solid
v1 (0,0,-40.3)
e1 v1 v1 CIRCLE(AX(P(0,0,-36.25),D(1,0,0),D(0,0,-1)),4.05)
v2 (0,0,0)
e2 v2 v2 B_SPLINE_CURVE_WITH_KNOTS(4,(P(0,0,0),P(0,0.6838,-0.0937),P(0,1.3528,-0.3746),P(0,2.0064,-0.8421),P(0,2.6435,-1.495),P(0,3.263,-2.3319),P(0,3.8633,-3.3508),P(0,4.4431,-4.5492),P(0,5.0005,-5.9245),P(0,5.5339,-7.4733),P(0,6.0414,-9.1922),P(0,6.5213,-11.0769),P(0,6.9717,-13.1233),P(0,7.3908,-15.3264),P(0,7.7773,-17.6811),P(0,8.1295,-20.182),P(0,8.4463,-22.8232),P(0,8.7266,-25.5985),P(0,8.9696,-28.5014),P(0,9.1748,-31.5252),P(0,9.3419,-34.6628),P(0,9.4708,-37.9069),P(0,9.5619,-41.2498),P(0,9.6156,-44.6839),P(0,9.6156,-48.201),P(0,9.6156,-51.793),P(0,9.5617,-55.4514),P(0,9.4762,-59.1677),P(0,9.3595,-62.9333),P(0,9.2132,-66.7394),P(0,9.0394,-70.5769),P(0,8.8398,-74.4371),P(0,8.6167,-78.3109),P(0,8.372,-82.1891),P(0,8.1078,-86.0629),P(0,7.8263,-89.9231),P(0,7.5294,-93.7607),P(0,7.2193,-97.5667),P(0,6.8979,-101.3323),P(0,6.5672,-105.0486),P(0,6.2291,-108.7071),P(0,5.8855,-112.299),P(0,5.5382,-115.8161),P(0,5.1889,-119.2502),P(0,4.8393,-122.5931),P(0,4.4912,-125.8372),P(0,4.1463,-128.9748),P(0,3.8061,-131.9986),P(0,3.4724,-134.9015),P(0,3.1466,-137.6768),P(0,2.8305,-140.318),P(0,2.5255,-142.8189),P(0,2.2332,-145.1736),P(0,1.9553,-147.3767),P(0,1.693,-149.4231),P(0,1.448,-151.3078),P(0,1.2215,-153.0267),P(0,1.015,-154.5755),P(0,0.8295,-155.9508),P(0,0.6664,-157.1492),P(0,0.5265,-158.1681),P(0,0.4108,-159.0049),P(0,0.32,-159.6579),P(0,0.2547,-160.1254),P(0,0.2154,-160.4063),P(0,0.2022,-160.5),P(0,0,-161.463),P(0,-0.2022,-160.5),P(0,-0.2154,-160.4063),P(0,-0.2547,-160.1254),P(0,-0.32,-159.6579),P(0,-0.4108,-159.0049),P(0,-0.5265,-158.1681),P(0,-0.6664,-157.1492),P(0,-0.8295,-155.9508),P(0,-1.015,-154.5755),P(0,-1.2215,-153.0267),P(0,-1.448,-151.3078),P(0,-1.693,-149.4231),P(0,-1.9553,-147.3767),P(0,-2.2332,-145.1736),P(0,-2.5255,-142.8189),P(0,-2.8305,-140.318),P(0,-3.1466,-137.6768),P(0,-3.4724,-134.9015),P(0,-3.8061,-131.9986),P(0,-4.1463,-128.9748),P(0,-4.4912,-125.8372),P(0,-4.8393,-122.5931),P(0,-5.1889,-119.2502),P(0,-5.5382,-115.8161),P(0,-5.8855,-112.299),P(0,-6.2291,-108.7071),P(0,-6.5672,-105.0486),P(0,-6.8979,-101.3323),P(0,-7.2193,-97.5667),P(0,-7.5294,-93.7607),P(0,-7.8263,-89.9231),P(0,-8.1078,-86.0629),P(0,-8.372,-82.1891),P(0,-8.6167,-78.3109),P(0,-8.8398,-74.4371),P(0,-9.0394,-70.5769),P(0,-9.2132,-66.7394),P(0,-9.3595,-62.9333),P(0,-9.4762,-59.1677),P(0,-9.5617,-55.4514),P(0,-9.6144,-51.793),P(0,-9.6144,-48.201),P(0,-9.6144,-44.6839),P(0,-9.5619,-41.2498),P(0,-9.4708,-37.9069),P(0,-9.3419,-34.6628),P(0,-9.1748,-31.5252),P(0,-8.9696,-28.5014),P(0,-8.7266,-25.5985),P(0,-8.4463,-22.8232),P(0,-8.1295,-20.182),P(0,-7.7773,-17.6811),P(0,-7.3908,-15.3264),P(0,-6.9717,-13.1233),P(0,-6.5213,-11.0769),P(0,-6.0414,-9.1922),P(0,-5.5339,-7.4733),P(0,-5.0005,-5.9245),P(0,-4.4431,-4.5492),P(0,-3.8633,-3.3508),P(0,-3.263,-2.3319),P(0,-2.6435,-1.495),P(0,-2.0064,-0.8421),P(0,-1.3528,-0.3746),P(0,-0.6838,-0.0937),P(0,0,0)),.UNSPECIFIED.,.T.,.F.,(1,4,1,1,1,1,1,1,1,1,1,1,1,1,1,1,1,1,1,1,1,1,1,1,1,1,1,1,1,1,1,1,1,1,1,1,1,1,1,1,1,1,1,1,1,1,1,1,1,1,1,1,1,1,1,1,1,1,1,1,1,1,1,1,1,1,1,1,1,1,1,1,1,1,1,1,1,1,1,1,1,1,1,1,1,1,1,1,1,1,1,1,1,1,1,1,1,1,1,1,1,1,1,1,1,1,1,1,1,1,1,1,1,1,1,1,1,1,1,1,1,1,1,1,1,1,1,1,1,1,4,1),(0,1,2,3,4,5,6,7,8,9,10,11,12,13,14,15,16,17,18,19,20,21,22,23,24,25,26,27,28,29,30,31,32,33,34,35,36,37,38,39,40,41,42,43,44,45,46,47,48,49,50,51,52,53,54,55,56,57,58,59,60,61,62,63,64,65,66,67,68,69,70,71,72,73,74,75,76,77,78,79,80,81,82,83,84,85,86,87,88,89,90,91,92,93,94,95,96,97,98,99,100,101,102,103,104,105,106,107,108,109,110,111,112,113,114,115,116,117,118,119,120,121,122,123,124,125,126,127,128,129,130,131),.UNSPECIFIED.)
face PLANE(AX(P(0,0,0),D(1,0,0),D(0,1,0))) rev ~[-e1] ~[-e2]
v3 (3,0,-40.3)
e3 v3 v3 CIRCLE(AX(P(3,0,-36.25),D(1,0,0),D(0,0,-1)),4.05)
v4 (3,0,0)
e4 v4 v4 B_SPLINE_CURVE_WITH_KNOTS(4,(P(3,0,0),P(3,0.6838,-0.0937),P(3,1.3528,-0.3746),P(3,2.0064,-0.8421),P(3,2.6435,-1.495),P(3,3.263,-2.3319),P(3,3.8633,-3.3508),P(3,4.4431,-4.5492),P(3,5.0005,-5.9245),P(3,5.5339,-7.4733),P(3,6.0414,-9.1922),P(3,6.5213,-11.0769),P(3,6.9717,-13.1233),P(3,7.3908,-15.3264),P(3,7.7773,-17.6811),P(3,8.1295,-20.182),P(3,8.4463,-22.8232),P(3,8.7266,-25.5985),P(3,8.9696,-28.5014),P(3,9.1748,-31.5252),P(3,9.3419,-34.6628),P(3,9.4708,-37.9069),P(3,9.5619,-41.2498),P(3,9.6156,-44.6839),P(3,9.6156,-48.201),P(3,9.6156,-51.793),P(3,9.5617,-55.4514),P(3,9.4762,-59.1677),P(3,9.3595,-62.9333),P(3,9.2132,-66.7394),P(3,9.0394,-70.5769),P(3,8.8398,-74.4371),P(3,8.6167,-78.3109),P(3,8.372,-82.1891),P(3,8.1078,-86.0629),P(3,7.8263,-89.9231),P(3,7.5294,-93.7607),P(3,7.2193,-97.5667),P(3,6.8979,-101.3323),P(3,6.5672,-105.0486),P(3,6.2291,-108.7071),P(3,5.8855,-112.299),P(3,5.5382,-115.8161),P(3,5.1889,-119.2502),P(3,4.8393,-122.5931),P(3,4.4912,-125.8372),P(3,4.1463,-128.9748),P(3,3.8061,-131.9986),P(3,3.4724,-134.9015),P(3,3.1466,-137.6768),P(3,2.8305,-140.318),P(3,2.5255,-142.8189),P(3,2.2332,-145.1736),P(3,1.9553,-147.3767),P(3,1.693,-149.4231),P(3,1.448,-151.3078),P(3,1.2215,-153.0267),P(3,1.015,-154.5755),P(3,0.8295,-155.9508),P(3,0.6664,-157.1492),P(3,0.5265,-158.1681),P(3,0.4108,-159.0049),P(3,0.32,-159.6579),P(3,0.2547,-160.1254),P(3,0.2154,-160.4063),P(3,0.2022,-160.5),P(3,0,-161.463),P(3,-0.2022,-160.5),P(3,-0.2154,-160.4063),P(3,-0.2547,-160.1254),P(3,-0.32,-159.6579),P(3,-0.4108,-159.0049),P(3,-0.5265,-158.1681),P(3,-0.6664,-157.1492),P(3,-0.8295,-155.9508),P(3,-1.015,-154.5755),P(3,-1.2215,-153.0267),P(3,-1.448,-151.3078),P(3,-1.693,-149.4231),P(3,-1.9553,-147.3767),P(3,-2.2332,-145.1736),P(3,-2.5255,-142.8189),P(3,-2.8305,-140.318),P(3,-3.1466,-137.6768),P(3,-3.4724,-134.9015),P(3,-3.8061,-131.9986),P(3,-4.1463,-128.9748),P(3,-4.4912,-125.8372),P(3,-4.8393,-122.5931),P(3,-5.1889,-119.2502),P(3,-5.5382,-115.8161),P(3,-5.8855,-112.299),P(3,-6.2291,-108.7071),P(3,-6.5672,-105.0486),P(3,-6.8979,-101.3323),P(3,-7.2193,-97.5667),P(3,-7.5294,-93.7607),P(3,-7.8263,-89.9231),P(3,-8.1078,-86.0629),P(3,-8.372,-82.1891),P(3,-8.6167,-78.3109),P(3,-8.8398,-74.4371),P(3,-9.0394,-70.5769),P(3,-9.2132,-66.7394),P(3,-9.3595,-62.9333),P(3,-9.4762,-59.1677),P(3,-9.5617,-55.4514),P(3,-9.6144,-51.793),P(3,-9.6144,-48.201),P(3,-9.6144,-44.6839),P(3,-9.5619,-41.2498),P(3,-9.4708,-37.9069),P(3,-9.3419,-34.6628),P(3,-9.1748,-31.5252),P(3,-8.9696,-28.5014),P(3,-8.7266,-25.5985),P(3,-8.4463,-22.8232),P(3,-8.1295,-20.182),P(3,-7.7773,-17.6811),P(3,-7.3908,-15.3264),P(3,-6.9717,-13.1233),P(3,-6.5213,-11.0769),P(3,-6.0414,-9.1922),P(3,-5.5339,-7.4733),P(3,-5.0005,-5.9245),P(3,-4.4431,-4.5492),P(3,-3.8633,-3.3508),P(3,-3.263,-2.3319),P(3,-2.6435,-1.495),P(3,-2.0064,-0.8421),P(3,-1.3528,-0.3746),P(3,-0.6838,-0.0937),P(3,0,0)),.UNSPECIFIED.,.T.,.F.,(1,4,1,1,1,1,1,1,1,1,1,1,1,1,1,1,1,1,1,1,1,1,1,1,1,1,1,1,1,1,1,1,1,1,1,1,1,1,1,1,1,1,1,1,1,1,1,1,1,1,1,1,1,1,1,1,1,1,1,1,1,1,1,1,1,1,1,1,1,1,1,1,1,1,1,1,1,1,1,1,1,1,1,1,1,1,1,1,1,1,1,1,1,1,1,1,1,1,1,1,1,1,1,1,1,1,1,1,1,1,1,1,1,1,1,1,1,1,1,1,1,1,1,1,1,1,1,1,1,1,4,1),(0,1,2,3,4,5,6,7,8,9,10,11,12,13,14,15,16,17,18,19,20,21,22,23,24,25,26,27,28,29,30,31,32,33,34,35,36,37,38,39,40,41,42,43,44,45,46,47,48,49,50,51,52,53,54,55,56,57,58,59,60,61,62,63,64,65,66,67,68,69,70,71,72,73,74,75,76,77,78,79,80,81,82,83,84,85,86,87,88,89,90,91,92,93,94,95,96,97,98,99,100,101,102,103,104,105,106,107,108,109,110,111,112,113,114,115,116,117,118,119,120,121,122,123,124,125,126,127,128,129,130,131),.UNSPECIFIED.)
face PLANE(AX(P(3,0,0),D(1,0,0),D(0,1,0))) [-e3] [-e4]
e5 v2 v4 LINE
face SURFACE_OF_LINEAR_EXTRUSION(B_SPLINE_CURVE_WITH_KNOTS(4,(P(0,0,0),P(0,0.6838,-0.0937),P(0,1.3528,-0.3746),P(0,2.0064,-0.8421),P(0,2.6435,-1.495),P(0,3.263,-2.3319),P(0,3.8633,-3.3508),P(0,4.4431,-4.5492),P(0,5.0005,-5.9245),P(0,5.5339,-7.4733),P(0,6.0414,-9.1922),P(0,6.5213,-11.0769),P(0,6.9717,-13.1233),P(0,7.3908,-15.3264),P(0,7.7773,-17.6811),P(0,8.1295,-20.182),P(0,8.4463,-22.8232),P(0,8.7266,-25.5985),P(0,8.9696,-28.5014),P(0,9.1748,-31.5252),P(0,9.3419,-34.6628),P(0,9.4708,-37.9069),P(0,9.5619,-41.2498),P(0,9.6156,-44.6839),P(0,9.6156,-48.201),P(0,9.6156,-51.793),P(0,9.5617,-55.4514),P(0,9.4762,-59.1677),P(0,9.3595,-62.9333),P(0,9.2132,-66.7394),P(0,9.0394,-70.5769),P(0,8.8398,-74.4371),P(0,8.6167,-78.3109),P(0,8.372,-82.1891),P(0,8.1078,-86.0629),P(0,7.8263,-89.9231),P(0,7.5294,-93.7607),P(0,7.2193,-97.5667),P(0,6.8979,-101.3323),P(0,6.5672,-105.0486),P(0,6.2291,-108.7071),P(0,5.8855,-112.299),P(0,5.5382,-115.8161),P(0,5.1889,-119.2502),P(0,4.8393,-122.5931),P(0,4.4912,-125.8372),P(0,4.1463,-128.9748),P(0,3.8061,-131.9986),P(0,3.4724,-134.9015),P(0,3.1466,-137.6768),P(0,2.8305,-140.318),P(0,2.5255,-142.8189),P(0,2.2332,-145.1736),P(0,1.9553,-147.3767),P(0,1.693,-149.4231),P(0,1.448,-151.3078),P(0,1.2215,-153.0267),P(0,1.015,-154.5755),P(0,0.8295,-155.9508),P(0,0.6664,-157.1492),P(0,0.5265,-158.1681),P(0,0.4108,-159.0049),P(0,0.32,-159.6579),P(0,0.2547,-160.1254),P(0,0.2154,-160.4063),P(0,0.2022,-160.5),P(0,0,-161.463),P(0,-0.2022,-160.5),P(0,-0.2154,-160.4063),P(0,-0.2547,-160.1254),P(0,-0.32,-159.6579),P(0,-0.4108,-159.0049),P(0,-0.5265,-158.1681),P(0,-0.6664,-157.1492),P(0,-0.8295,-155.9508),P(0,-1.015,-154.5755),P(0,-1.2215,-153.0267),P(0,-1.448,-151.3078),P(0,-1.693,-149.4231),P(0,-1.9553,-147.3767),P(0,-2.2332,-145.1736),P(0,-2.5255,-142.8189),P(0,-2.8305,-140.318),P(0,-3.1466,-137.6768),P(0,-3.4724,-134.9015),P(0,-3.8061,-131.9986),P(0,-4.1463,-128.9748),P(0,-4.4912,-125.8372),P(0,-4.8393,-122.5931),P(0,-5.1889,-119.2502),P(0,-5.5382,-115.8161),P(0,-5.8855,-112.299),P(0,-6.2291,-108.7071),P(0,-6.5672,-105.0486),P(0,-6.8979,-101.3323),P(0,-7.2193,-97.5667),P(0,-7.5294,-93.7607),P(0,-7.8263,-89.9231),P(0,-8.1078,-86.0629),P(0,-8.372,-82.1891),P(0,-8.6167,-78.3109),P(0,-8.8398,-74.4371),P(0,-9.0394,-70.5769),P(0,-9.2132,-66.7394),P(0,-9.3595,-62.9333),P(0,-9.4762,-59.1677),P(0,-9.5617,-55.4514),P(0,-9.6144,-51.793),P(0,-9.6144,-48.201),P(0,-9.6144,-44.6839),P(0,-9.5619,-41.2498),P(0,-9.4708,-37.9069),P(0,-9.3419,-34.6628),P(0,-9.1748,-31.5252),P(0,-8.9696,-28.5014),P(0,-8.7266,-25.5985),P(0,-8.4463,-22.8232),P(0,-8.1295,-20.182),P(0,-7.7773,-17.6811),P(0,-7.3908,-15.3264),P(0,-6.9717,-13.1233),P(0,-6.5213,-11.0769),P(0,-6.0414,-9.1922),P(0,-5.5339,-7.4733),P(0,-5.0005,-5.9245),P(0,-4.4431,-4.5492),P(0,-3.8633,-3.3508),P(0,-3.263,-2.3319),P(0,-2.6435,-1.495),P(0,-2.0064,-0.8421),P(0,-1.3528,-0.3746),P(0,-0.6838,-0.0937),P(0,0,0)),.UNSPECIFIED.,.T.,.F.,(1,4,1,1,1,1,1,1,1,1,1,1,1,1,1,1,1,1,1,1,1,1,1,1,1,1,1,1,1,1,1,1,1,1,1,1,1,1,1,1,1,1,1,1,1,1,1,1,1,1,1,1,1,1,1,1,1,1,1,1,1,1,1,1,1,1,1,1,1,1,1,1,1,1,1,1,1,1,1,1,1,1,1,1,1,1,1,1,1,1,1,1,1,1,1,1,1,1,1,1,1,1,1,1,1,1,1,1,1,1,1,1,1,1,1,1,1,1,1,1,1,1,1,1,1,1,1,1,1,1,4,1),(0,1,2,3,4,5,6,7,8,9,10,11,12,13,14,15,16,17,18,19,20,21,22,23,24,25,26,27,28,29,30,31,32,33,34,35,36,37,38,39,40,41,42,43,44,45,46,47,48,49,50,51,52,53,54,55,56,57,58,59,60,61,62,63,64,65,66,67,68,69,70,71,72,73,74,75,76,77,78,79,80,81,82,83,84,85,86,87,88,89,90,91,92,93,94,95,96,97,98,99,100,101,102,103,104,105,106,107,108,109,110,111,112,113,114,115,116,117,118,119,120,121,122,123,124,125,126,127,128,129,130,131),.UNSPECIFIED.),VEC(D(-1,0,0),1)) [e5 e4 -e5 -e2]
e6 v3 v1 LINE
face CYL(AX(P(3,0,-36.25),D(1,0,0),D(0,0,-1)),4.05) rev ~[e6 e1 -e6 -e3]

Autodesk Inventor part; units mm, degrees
ref_plane "YZ Plane" through (0, 0, 0) normal (1, 0, 0) x (0, 1, 0)
ref_plane "XZ Plane" through (0, 0, 0) normal (0, 1, 0) x (-1, 0, 0)
ref_plane "XY Plane" through (0, 0, 0) normal (0, 0, 1) x (1, 0, 0)
sketch "Sketch9" plane through (0, 0, 0) normal (1, 0, 0) x (0, 1, 0)
  line L0 (0, 0) -> (0.6838, -0.0937) construction
  line L1 (0.6838, -0.0937) -> (1.3528, -0.3746) construction
  line L2 (1.3528, -0.3746) -> (2.0064, -0.8421) construction
  line L3 (2.0064, -0.8421) -> (2.6435, -1.495) construction
  line L4 (2.6435, -1.495) -> (3.263, -2.3319) construction
  line L5 (3.263, -2.3319) -> (3.8633, -3.3508) construction
  line L6 (3.8633, -3.3508) -> (4.4431, -4.5492) construction
  line L7 (4.4431, -4.5492) -> (5.0005, -5.9245) construction
  line L8 (5.0005, -5.9245) -> (5.5339, -7.4733) construction
  line L9 (5.5339, -7.4733) -> (6.0414, -9.1922) construction
  line L10 (6.0414, -9.1922) -> (6.5213, -11.0769) construction
  line L11 (6.5213, -11.0769) -> (6.9717, -13.1233) construction
  line L12 (6.9717, -13.1233) -> (7.3908, -15.3264) construction
  line L13 (7.3908, -15.3264) -> (7.7773, -17.6811) construction
  line L14 (7.7773, -17.6811) -> (8.1295, -20.182) construction
  line L15 (8.1295, -20.182) -> (8.4463, -22.8232) construction
  line L16 (8.4463, -22.8232) -> (8.7266, -25.5985) construction
  line L17 (8.7266, -25.5985) -> (8.9696, -28.5014) construction
  line L18 (8.9696, -28.5014) -> (9.1748, -31.5252) construction
  line L19 (9.1748, -31.5252) -> (9.3419, -34.6628) construction
  line L20 (9.3419, -34.6628) -> (9.4708, -37.9069) construction
  line L21 (9.4708, -37.9069) -> (9.5619, -41.2498) construction
  line L22 (9.5619, -41.2498) -> (9.6156, -44.6839) construction
  line L23 (9.6156, -44.6839) -> (9.6156, -48.201) construction
  line L24 (9.6156, -48.201) -> (9.6156, -51.793) construction
  line L25 (9.6156, -51.793) -> (9.5617, -55.4514) construction
  line L26 (9.5617, -55.4514) -> (9.4762, -59.1677) construction
  line L27 (9.4762, -59.1677) -> (9.3595, -62.9333) construction
  line L28 (9.3595, -62.9333) -> (9.2132, -66.7394) construction
  line L29 (9.2132, -66.7394) -> (9.0394, -70.5769) construction
  line L30 (9.0394, -70.5769) -> (8.8398, -74.4371) construction
  line L31 (8.8398, -74.4371) -> (8.6167, -78.3109) construction
  line L32 (8.6167, -78.3109) -> (8.372, -82.1891) construction
  line L33 (8.372, -82.1891) -> (8.1078, -86.0629) construction
  line L34 (8.1078, -86.0629) -> (7.8263, -89.9231) construction
  line L35 (7.8263, -89.9231) -> (7.5294, -93.7607) construction
  line L36 (7.5294, -93.7607) -> (7.2193, -97.5667) construction
  line L37 (7.2193, -97.5667) -> (6.8979, -101.3323) construction
  line L38 (6.8979, -101.3323) -> (6.5672, -105.0486) construction
  line L39 (6.5672, -105.0486) -> (6.2291, -108.7071) construction
  line L40 (6.2291, -108.7071) -> (5.8855, -112.299) construction
  line L41 (5.8855, -112.299) -> (5.5382, -115.8161) construction
  line L42 (5.5382, -115.8161) -> (5.1889, -119.2502) construction
  line L43 (5.1889, -119.2502) -> (4.8393, -122.5931) construction
  line L44 (4.8393, -122.5931) -> (4.4912, -125.8372) construction
  line L45 (4.4912, -125.8372) -> (4.1463, -128.9748) construction
  line L46 (4.1463, -128.9748) -> (3.8061, -131.9986) construction
  line L47 (3.8061, -131.9986) -> (3.4724, -134.9015) construction
  line L48 (3.4724, -134.9015) -> (3.1466, -137.6768) construction
  line L49 (3.1466, -137.6768) -> (2.8305, -140.318) construction
  line L50 (2.8305, -140.318) -> (2.5255, -142.8189) construction
  line L51 (2.5255, -142.8189) -> (2.2332, -145.1736) construction
  line L52 (2.2332, -145.1736) -> (1.9553, -147.3767) construction
  line L53 (1.9553, -147.3767) -> (1.693, -149.4231) construction
  line L54 (1.693, -149.4231) -> (1.448, -151.3078) construction
  line L55 (1.448, -151.3078) -> (1.2215, -153.0267) construction
  line L56 (1.2215, -153.0267) -> (1.015, -154.5755) construction
  line L57 (1.015, -154.5755) -> (0.8295, -155.9508) construction
  line L58 (0.8295, -155.9508) -> (0.6664, -157.1492) construction
  line L59 (0.6664, -157.1492) -> (0.5265, -158.1681) construction
  line L60 (0.5265, -158.1681) -> (0.4108, -159.0049) construction
  line L61 (0.4108, -159.0049) -> (0.32, -159.6579) construction
  line L62 (0.32, -159.6579) -> (0.2547, -160.1254) construction
  line L63 (0.2547, -160.1254) -> (0.2154, -160.4063) construction
  line L64 (0.2154, -160.4063) -> (0.2022, -160.5) construction
  line L65 (0.2022, -160.5) -> (0, -161.463) construction
  line L66 (0, -161.463) -> (-0.2022, -160.5) construction
  line L67 (-0.2022, -160.5) -> (-0.2154, -160.4063) construction
  line L68 (-0.2154, -160.4063) -> (-0.2547, -160.1254) construction
  line L69 (-0.2547, -160.1254) -> (-0.32, -159.6579) construction
  line L70 (-0.32, -159.6579) -> (-0.4108, -159.0049) construction
  line L71 (-0.4108, -159.0049) -> (-0.5265, -158.1681) construction
  line L72 (-0.5265, -158.1681) -> (-0.6664, -157.1492) construction
  line L73 (-0.6664, -157.1492) -> (-0.8295, -155.9508) construction
  line L74 (-0.8295, -155.9508) -> (-1.015, -154.5755) construction
  line L75 (-1.015, -154.5755) -> (-1.2215, -153.0267) construction
  line L76 (-1.2215, -153.0267) -> (-1.448, -151.3078) construction
  line L77 (-1.448, -151.3078) -> (-1.693, -149.4231) construction
  line L78 (-1.693, -149.4231) -> (-1.9553, -147.3767) construction
  line L79 (-1.9553, -147.3767) -> (-2.2332, -145.1736) construction
  line L80 (-2.2332, -145.1736) -> (-2.5255, -142.8189) construction
  line L81 (-2.5255, -142.8189) -> (-2.8305, -140.318) construction
  line L82 (-2.8305, -140.318) -> (-3.1466, -137.6768) construction
  line L83 (-3.1466, -137.6768) -> (-3.4724, -134.9015) construction
  line L84 (-3.4724, -134.9015) -> (-3.8061, -131.9986) construction
  line L85 (-3.8061, -131.9986) -> (-4.1463, -128.9748) construction
  line L86 (-4.1463, -128.9748) -> (-4.4912, -125.8372) construction
  line L87 (-4.4912, -125.8372) -> (-4.8393, -122.5931) construction
  line L88 (-4.8393, -122.5931) -> (-5.1889, -119.2502) construction
  line L89 (-5.1889, -119.2502) -> (-5.5382, -115.8161) construction
  line L90 (-5.5382, -115.8161) -> (-5.8855, -112.299) construction
  line L91 (-5.8855, -112.299) -> (-6.2291, -108.7071) construction
  line L92 (-6.2291, -108.7071) -> (-6.5672, -105.0486) construction
  line L93 (-6.5672, -105.0486) -> (-6.8979, -101.3323) construction
  line L94 (-6.8979, -101.3323) -> (-7.2193, -97.5667) construction
  line L95 (-7.2193, -97.5667) -> (-7.5294, -93.7607) construction
  line L96 (-7.5294, -93.7607) -> (-7.8263, -89.9231) construction
  line L97 (-7.8263, -89.9231) -> (-8.1078, -86.0629) construction
  line L98 (-8.1078, -86.0629) -> (-8.372, -82.1891) construction
  line L99 (-8.372, -82.1891) -> (-8.6167, -78.3109) construction
  line L100 (-8.6167, -78.3109) -> (-8.8398, -74.4371) construction
  line L101 (-8.8398, -74.4371) -> (-9.0394, -70.5769) construction
  line L102 (-9.0394, -70.5769) -> (-9.2132, -66.7394) construction
  line L103 (-9.2132, -66.7394) -> (-9.3595, -62.9333) construction
  line L104 (-9.3595, -62.9333) -> (-9.4762, -59.1677) construction
  line L105 (-9.4762, -59.1677) -> (-9.5617, -55.4514) construction
  line L106 (-9.5617, -55.4514) -> (-9.6144, -51.793) construction
  line L107 (-9.6144, -51.793) -> (-9.6144, -48.201) construction
  line L108 (-9.6144, -48.201) -> (-9.6144, -44.6839) construction
  line L109 (-9.6144, -44.6839) -> (-9.5619, -41.2498) construction
  line L110 (-9.5619, -41.2498) -> (-9.4708, -37.9069) construction
  line L111 (-9.4708, -37.9069) -> (-9.3419, -34.6628) construction
  line L112 (-9.3419, -34.6628) -> (-9.1748, -31.5252) construction
  line L113 (-9.1748, -31.5252) -> (-8.9696, -28.5014) construction
  line L114 (-8.9696, -28.5014) -> (-8.7266, -25.5985) construction
  line L115 (-8.7266, -25.5985) -> (-8.4463, -22.8232) construction
  line L116 (-8.4463, -22.8232) -> (-8.1295, -20.182) construction
  line L117 (-8.1295, -20.182) -> (-7.7773, -17.6811) construction
  line L118 (-7.7773, -17.6811) -> (-7.3908, -15.3264) construction
  line L119 (-7.3908, -15.3264) -> (-6.9717, -13.1233) construction
  line L120 (-6.9717, -13.1233) -> (-6.5213, -11.0769) construction
  line L121 (-6.5213, -11.0769) -> (-6.0414, -9.1922) construction
  line L122 (-6.0414, -9.1922) -> (-5.5339, -7.4733) construction
  line L123 (-5.5339, -7.4733) -> (-5.0005, -5.9245) construction
  line L124 (-5.0005, -5.9245) -> (-4.4431, -4.5492) construction
  line L125 (-4.4431, -4.5492) -> (-3.8633, -3.3508) construction
  line L126 (-3.8633, -3.3508) -> (-3.263, -2.3319) construction
  line L127 (-3.263, -2.3319) -> (-2.6435, -1.495) construction
  line L128 (-2.6435, -1.495) -> (-2.0064, -0.8421) construction
  line L129 (-2.0064, -0.8421) -> (-1.3528, -0.3746) construction
  line L130 (-1.3528, -0.3746) -> (-0.6838, -0.0937) construction
  line L131 (-0.6838, -0.0937) -> (0, 0) construction
  spline S0 degree 4 poles (0, 0) (0.6838, -0.0937) (1.3528, -0.3746) (2.0064, -0.8421) (2.6435, -1.495) (3.263, -2.3319) (3.8633, -3.3508) (4.4431, -4.5492) (5.0005, -5.9245) (5.5339, -7.4733) (6.0414, -9.1922) (6.5213, -11.0769) (6.9717, -13.1233) (7.3908, -15.3264) (7.7773, -17.6811) (8.1295, -20.182) (8.4463, -22.8232) (8.7266, -25.5985) (8.9696, -28.5014) (9.1748, -31.5252) (9.3419, -34.6628) (9.4708, -37.9069) (9.5619, -41.2498) (9.6156, -44.6839) (9.6156, -48.201) (9.6156, -51.793) (9.5617, -55.4514) (9.4762, -59.1677) (9.3595, -62.9333) (9.2132, -66.7394) (9.0394, -70.5769) (8.8398, -74.4371) (8.6167, -78.3109) (8.372, -82.1891) (8.1078, -86.0629) (7.8263, -89.9231) (7.5294, -93.7607) (7.2193, -97.5667) (6.8979, -101.3323) (6.5672, -105.0486) (6.2291, -108.7071) (5.8855, -112.299) (5.5382, -115.8161) (5.1889, -119.2502) (4.8393, -122.5931) (4.4912, -125.8372) (4.1463, -128.9748) (3.8061, -131.9986) (3.4724, -134.9015) (3.1466, -137.6768) (2.8305, -140.318) (2.5255, -142.8189) (2.2332, -145.1736) (1.9553, -147.3767) (1.693, -149.4231) (1.448, -151.3078) (1.2215, -153.0267) (1.015, -154.5755) (0.8295, -155.9508) (0.6664, -157.1492) (0.5265, -158.1681) (0.4108, -159.0049) (0.32, -159.6579) (0.2547, -160.1254) (0.2154, -160.4063) (0.2022, -160.5) (0, -161.463) (-0.2022, -160.5) (-0.2154, -160.4063) (-0.2547, -160.1254) (-0.32, -159.6579) (-0.4108, -159.0049) (-0.5265, -158.1681) (-0.6664, -157.1492) (-0.8295, -155.9508) (-1.015, -154.5755) (-1.2215, -153.0267) (-1.448, -151.3078) (-1.693, -149.4231) (-1.9553, -147.3767) (-2.2332, -145.1736) (-2.5255, -142.8189) (-2.8305, -140.318) (-3.1466, -137.6768) (-3.4724, -134.9015) (-3.8061, -131.9986) (-4.1463, -128.9748) (-4.4912, -125.8372) (-4.8393, -122.5931) (-5.1889, -119.2502) (-5.5382, -115.8161) (-5.8855, -112.299) (-6.2291, -108.7071) (-6.5672, -105.0486) (-6.8979, -101.3323) (-7.2193, -97.5667) (-7.5294, -93.7607) (-7.8263, -89.9231) (-8.1078, -86.0629) (-8.372, -82.1891) (-8.6167, -78.3109) (-8.8398, -74.4371) (-9.0394, -70.5769) (-9.2132, -66.7394) (-9.3595, -62.9333) (-9.4762, -59.1677) (-9.5617, -55.4514) (-9.6144, -51.793) (-9.6144, -48.201) (-9.6144, -44.6839) (-9.5619, -41.2498) (-9.4708, -37.9069) (-9.3419, -34.6628) (-9.1748, -31.5252) (-8.9696, -28.5014) (-8.7266, -25.5985) (-8.4463, -22.8232) (-8.1295, -20.182) (-7.7773, -17.6811) (-7.3908, -15.3264) (-6.9717, -13.1233) (-6.5213, -11.0769) (-6.0414, -9.1922) (-5.5339, -7.4733) (-5.0005, -5.9245) (-4.4431, -4.5492) (-3.8633, -3.3508) (-3.263, -2.3319) (-2.6435, -1.495) (-2.0064, -0.8421) (-1.3528, -0.3746) (-0.6838, -0.0937) (0, 0) knots 1 1 1 1 1 2 3 4 5 6 7 8 9 10 11 12 13 14 15 16 17 18 19 20 21 22 23 24 25 26 27 28 29 30 31 32 33 34 35 36 37 38 39 40 41 42 43 44 45 46 47 48 49 50 51 52 53 54 55 56 57 58 59 60 61 62 63 64 65 66 67 68 69 70 71 72 73 74 75 76 77 78 79 80 81 82 83 84 85 86 87 88 89 90 91 92 93 94 95 96 97 98 99 100 101 102 103 104 105 106 107 108 109 110 111 112 113 114 115 116 117 118 119 120 121 122 123 124 125 126 127 128 129 130 130 130 130 130
extrude "Extrusion3" add sketch "Sketch9" along normal blind 3
sketch "Sketch10" plane through (3, 0, 0) normal (1, 0, 0) x (0, 0, -1)
  circle A0 centre (36.25, 0) radius 4.05
  point P0 (0, 0)
  dimension "d88" = 8.1
  dimension "d89" = 36.25
extrude "Extrusion4" cut sketch "Sketch10" against normal blind 10
properties part number "6P-007" material "Poplar"
